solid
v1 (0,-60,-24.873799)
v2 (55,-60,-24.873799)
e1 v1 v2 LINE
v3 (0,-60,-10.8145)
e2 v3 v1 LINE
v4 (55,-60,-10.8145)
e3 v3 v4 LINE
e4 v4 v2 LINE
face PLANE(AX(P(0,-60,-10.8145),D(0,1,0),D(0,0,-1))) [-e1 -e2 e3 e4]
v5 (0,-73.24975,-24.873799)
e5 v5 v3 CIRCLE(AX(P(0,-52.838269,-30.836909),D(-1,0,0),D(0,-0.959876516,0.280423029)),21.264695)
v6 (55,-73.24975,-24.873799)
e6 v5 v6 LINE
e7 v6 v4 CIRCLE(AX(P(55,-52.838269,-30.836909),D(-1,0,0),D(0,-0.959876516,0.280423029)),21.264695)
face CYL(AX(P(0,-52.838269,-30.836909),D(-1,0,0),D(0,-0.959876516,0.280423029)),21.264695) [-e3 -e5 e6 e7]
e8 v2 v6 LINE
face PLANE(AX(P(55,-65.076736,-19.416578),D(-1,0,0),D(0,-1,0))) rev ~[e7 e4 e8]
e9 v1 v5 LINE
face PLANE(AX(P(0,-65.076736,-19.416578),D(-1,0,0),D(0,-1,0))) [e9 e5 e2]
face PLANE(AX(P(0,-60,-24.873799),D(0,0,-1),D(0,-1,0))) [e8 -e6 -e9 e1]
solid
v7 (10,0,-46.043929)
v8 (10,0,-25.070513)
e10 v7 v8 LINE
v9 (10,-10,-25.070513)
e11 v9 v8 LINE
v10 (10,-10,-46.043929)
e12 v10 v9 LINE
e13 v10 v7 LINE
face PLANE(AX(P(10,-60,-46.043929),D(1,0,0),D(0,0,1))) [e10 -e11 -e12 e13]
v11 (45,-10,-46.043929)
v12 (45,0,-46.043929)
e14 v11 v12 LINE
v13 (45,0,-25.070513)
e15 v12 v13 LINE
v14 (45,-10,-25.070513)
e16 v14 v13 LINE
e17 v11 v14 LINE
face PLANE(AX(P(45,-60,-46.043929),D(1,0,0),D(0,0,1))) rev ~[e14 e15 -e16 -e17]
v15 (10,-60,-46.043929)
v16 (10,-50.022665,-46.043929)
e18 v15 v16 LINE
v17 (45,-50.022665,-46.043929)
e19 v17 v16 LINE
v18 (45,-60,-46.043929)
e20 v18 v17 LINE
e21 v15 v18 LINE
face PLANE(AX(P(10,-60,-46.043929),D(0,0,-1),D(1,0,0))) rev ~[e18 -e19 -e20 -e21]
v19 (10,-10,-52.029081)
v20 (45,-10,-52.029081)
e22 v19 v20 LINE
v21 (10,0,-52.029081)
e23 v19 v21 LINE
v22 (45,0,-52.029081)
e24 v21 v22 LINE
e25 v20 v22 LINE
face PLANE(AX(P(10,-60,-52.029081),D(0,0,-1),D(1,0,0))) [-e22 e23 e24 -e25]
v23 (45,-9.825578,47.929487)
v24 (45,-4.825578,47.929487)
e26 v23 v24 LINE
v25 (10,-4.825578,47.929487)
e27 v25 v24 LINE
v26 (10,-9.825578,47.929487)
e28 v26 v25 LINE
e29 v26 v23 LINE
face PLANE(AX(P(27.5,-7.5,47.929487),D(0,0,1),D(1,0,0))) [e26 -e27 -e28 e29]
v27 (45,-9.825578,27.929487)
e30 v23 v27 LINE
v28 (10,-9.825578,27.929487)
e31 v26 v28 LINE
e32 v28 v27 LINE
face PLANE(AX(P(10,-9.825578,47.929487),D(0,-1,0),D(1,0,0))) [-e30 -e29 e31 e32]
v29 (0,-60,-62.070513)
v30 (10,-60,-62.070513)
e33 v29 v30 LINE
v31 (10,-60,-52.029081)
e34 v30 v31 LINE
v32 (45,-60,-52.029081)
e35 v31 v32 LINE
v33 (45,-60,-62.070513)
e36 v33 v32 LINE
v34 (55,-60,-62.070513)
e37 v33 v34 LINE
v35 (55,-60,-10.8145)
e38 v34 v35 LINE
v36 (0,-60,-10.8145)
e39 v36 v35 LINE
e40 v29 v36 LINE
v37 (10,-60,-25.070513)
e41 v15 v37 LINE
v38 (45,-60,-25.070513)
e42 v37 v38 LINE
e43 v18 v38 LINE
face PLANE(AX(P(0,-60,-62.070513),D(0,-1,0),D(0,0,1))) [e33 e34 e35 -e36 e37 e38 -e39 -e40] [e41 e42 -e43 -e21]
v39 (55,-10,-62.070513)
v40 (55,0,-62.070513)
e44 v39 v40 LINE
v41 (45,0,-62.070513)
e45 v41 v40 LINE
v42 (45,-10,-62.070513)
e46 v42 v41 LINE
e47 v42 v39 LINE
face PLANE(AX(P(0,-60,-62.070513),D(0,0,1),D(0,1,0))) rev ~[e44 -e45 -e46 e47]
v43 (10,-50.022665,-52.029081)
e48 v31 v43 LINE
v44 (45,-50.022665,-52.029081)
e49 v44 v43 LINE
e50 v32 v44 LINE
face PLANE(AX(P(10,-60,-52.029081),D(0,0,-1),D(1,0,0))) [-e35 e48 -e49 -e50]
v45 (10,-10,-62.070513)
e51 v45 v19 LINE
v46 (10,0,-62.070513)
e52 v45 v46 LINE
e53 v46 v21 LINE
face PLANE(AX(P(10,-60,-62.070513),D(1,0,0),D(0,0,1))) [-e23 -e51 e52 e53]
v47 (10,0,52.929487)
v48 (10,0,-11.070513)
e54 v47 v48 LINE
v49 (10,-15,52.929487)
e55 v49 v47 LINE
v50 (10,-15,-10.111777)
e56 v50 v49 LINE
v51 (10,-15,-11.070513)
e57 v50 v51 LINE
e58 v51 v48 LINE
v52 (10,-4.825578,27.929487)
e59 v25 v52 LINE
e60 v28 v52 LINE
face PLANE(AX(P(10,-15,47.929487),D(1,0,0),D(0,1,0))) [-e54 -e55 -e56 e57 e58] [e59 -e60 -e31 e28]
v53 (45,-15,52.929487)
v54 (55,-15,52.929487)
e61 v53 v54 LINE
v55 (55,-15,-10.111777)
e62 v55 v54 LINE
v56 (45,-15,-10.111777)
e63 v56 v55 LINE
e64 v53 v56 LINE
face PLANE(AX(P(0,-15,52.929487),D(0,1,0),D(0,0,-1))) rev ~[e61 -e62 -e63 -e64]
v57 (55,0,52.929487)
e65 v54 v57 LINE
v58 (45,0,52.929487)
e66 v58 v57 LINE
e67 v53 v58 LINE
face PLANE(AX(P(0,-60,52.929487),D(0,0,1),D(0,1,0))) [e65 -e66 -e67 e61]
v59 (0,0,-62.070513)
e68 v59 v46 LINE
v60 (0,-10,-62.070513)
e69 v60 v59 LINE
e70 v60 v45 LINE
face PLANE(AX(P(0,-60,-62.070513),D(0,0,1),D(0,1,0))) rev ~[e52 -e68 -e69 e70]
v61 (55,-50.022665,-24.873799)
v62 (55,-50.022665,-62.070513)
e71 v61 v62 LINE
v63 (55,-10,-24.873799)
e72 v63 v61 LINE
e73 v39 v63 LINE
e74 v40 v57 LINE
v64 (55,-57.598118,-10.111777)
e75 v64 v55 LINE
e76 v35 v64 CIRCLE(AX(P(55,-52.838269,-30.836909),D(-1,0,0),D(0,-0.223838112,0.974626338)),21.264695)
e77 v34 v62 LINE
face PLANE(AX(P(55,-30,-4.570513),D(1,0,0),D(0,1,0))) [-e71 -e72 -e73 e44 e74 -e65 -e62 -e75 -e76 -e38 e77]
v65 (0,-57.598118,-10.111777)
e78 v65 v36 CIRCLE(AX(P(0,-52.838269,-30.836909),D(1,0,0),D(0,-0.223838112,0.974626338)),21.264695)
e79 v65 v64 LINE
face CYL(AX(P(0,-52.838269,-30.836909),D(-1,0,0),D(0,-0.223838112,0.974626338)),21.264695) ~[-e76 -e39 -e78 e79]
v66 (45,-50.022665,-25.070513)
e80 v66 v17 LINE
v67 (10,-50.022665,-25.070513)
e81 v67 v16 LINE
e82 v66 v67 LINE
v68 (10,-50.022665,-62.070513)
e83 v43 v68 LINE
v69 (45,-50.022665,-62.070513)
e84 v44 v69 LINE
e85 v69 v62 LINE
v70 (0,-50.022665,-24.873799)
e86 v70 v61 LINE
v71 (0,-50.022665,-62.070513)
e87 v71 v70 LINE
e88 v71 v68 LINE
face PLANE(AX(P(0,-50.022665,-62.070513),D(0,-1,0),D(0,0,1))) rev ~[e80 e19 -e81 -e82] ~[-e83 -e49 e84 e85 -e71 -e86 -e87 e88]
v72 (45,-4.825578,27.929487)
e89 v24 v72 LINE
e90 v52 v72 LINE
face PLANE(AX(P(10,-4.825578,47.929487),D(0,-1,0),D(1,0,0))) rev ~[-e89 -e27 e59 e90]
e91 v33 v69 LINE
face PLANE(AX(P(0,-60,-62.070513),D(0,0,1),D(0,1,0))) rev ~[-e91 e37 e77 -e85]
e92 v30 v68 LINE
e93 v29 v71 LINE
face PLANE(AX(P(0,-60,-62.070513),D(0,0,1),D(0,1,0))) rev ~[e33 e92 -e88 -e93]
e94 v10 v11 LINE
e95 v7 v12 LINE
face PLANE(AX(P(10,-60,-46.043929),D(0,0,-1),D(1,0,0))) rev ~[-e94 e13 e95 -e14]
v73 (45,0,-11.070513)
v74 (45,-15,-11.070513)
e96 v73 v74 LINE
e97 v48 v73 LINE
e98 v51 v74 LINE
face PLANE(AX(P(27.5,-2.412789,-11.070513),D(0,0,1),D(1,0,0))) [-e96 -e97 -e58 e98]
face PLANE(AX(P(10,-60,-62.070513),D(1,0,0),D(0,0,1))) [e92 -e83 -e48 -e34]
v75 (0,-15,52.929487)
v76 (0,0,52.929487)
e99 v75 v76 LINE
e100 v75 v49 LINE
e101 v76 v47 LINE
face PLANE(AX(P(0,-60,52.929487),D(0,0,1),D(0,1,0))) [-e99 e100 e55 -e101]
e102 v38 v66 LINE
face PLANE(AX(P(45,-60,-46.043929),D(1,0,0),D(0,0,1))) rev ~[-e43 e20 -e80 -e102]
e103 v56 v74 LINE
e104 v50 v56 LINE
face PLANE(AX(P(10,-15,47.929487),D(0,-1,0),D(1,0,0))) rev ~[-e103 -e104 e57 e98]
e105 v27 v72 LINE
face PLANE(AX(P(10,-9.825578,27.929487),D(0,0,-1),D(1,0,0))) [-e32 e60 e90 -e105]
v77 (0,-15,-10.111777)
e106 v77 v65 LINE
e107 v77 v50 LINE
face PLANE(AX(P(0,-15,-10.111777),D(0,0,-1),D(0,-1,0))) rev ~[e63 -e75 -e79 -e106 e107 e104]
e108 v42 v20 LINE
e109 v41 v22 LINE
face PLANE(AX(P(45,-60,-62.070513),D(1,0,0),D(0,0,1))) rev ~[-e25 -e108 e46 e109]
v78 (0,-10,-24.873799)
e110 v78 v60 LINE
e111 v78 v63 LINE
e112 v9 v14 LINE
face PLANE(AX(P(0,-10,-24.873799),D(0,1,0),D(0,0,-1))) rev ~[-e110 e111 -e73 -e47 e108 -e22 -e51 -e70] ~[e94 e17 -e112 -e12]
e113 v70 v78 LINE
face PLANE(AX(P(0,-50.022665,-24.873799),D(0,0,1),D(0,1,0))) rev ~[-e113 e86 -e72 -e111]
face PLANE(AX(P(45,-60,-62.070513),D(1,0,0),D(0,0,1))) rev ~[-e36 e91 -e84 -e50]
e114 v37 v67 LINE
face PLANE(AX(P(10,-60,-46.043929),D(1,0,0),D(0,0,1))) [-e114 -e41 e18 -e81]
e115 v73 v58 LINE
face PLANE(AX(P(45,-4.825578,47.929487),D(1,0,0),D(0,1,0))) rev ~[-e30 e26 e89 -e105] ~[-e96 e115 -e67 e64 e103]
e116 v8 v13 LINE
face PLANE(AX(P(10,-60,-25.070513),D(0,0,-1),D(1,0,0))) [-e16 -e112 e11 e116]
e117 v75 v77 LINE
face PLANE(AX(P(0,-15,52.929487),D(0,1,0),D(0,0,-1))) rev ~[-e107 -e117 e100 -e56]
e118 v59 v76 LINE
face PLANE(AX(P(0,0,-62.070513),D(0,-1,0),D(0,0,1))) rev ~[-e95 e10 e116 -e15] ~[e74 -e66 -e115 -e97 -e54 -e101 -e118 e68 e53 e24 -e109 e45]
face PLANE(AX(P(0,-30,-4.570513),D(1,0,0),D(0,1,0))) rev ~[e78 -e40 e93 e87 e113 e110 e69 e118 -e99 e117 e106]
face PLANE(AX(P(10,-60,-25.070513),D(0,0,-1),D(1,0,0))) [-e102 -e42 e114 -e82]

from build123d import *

# Parameters (mm, degrees)
F0_W      = 60
F0_H      = 115
F1_DEPTH  = 55
F2_W      = 35
F2_H      = 10.0414325121
F3_DEPTH  = 90
F2_H_2    = 20.9734155115
F4_DEPTH  = 96
F7_DEPTH  = 55
F9_DEPTH  = 95
F10_W     = 35
F10_H     = 15
F11_DEPTH = 5
F12_W     = 35
F12_H     = 4.8255780712
F12_H_2   = 5.1744219288
F13_DEPTH = 59
F14_W     = 35
F14_H     = 39
F15_DEPTH = 25
F17_DEPTH = 95


with BuildPart() as f1:
    # F0 (on Right) → F1 (new body)
    with BuildSketch(Plane.YZ):
        with Locations((-30, -4.5705132011)):
            Rectangle(F0_W, F0_H)
    extrude(amount=F1_DEPTH)

    # F2 (on face) → F3 (cut)
    with BuildSketch(Plane.XZ.offset(60)):
        with Locations((27.5, -57.049796945)):
            Rectangle(F2_W, F2_H)
    extrude(amount=-F3_DEPTH, mode=Mode.SUBTRACT)

    # F2 (on face) → F4 (cut)
    with BuildSketch(Plane.XZ.offset(60)):
        with Locations((27.5, -35.5572209568)):
            Rectangle(F2_W, F2_H_2)
    extrude(amount=-F4_DEPTH, mode=Mode.SUBTRACT)

    # F8 (on face) → F9 (cut)
    with BuildSketch(Plane(origin=(0, 0, 0), x_dir=(0, -1, 0), z_dir=(-1, 0, 0))):
        with BuildLine():
            Line((15, 52.9294867989), (15, -10.1117771119))
            Line((15, -10.1117771119), (57.598117739, -10.1117771119))
            ThreePointArc((57.598117739, -10.1117771119), (58.8094054709, -10.4277742826), (60, -10.8145000884))
            Line((60, -10.8145000884), (60, 52.9294867989))
            Line((60, 52.9294867989), (15, 52.9294867989))
        make_face()
    extrude(amount=-F9_DEPTH, mode=Mode.SUBTRACT)

    # F10 (on face) → F11 (cut)
    with BuildSketch(Plane.XY.offset(52.9294867989)):
        with Locations((27.5, -7.5)):
            Rectangle(F10_W, F10_H)
    extrude(amount=-F11_DEPTH, mode=Mode.SUBTRACT)

    # F12 (on face) → F13 (cut)
    with BuildSketch(Plane.XY.offset(47.9294867989)):
        with Locations((27.5, -2.4127890356)):
            Rectangle(F12_W, F12_H)
        with Locations((27.5, -12.4127890356)):
            Rectangle(F12_W, F12_H_2)
    extrude(amount=-F13_DEPTH, mode=Mode.SUBTRACT)

    # F14 (on face) → F15 (cut)
    with BuildSketch(Plane.XZ.offset(9.8255780712)):
        with Locations((27.5, 8.4294867989)):
            Rectangle(F14_W, F14_H)
    extrude(amount=-F15_DEPTH, mode=Mode.SUBTRACT)

    # F16 (on face) → F17 (cut)
    with BuildSketch(Plane(origin=(0, 0, 0), x_dir=(0, -1, 0), z_dir=(-1, 0, 0))):
        Polygon((50.0226652549, -62.0705132011), (50.0226652549, -45.8980772977), (50.0226652549, -24.8737987131), (10, -24.8737987131), (10, -45.8980772977), (10, -62.0705132011), align=None)
    extrude(amount=-F17_DEPTH, mode=Mode.SUBTRACT)


with BuildPart() as f7:
    # F6 (on face) → F7 (new body)
    with BuildSketch(Plane(origin=(0, 0, 0), x_dir=(0, -1, 0), z_dir=(-1, 0, 0))):
        with BuildLine():
            ThreePointArc((73.2497498393, -24.8737987131), (68.3136194252, -16.25264453), (60, -10.8145000884))
            Line((60, -10.8145000884), (60, -24.8737987131))
            Line((60, -24.8737987131), (73.2497498393, -24.8737987131))
        make_face()
    extrude(amount=-F7_DEPTH)


solid = Compound([f1.part, f7.part])
